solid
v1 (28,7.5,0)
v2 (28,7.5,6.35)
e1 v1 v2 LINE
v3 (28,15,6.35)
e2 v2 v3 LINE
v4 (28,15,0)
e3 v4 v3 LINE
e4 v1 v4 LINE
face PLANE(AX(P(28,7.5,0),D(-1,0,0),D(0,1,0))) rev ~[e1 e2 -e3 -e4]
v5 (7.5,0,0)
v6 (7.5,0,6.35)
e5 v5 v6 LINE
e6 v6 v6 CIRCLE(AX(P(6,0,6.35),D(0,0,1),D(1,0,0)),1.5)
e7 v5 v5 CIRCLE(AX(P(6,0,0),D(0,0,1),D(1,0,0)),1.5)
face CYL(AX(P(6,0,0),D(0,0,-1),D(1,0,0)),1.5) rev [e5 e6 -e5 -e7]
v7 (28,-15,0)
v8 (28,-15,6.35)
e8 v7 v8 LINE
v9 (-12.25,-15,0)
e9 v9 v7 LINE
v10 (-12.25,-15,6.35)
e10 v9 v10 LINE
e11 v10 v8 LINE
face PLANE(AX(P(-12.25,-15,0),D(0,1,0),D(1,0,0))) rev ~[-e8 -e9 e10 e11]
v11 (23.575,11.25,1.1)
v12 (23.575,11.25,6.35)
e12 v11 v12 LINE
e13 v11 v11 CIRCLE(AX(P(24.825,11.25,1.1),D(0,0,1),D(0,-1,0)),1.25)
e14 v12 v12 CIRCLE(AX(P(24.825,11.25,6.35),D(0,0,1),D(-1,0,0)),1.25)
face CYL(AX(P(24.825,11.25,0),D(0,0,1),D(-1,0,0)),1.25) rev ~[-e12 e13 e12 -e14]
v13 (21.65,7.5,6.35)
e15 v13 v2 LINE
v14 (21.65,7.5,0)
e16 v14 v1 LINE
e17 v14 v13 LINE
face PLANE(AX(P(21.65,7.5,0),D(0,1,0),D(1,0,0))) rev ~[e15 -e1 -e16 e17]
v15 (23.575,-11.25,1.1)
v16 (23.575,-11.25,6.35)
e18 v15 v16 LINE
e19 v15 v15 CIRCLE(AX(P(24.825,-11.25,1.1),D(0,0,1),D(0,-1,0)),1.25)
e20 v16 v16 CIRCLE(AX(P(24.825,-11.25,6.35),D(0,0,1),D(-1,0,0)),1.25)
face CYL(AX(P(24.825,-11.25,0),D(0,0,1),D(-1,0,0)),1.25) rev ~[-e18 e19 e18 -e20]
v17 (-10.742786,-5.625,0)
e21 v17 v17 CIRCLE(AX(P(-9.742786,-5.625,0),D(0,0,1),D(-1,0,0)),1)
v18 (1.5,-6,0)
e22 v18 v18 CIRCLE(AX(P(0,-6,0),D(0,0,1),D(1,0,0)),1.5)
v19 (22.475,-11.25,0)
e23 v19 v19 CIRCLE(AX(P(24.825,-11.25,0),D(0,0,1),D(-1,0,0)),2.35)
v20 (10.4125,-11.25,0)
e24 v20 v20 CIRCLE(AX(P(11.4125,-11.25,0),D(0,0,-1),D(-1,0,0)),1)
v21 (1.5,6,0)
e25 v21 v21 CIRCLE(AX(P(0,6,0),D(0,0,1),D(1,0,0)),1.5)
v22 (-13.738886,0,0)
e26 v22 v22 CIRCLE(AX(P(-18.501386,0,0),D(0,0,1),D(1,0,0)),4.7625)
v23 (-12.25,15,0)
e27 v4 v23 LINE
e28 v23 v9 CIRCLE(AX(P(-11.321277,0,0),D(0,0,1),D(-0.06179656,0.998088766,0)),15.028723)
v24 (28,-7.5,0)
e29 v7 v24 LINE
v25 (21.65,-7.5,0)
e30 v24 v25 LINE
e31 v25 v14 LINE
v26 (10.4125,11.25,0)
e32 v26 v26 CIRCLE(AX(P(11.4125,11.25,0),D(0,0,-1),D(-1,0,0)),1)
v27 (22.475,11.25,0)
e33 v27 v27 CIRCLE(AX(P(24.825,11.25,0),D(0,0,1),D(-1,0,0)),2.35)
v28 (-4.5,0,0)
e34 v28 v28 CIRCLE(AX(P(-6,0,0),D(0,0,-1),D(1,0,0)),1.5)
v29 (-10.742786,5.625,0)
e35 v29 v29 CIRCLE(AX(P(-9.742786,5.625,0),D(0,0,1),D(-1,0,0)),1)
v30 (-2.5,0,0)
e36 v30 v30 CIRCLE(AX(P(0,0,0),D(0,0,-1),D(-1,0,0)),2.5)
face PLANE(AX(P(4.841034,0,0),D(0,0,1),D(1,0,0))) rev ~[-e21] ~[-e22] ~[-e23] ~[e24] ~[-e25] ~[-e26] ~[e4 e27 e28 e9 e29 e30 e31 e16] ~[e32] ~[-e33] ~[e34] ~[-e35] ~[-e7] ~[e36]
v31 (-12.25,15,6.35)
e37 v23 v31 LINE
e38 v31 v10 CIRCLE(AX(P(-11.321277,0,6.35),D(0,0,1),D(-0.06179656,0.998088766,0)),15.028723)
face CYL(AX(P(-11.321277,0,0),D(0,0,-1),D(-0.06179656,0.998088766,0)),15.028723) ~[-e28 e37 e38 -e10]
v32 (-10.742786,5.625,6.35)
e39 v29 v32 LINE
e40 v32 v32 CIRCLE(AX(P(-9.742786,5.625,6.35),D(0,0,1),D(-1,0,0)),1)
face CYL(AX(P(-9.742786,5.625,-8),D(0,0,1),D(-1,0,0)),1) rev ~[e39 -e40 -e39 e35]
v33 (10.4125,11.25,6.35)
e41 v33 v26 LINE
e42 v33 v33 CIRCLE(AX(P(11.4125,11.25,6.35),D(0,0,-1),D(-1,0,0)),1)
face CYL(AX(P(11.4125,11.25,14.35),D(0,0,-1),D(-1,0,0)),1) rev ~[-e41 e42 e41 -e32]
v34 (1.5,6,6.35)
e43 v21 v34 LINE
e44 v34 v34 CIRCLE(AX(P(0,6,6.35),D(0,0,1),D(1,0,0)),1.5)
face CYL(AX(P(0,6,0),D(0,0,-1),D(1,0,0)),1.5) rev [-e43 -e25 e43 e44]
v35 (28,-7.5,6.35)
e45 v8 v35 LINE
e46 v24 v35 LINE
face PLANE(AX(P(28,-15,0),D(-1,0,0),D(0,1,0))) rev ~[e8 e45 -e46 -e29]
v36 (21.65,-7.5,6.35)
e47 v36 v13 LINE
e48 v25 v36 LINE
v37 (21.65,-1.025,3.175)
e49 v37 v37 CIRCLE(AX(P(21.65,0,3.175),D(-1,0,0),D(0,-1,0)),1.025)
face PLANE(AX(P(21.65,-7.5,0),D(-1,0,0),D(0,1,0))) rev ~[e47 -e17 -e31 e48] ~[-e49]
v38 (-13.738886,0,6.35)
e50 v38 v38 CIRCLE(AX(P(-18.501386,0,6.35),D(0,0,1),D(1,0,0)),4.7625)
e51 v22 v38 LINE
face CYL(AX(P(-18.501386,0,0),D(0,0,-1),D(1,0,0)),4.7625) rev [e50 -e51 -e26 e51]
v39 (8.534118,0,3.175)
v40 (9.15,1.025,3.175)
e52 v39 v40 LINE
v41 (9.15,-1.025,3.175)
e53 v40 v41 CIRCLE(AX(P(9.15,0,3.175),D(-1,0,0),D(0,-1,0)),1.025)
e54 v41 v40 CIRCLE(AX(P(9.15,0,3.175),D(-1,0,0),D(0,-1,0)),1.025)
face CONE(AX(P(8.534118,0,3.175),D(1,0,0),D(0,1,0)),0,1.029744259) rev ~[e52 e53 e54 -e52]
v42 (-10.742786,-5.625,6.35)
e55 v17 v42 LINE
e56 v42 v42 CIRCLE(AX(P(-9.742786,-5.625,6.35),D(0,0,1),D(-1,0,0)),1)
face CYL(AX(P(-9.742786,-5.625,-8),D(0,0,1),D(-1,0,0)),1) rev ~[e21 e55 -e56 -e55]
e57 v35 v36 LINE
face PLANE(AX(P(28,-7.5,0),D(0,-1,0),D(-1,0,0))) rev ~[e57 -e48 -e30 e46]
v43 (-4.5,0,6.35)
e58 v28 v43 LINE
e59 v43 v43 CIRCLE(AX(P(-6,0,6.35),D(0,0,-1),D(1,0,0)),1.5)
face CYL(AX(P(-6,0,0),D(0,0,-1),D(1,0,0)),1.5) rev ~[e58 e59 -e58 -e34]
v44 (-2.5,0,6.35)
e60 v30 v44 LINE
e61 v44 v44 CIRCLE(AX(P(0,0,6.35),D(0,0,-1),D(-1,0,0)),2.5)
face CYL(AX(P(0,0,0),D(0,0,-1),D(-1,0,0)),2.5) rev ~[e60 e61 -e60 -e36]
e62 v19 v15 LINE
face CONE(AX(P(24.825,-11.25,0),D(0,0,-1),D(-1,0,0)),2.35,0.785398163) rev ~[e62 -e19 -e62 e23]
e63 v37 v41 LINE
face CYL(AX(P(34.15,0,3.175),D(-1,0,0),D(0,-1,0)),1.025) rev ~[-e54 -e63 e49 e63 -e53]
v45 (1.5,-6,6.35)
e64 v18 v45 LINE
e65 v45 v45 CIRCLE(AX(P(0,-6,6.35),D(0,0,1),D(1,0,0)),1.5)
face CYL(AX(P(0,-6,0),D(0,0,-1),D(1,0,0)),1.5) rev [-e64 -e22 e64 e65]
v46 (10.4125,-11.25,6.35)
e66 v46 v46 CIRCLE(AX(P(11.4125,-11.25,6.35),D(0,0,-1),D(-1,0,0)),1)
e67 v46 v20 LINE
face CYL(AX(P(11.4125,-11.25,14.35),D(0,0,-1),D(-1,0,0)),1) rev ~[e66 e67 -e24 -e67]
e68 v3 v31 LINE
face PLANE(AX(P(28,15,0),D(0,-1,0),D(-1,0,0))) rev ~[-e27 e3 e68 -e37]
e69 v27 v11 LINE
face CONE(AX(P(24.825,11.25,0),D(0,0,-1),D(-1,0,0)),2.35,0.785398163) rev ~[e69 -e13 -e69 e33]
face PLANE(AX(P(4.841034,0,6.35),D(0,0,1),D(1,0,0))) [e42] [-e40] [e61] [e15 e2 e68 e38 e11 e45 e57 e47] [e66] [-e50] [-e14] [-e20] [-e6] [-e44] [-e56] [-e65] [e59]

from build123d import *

# Parameters (mm, degrees)
F0_R           = 1.5
F0_R_2         = 4.7625
F1_DEPTH       = 6.35
F2_D           = 2.5
F2_CSINK_D     = 4.7
F2_CSINK_ANGLE = 90
F4_D           = 2.05
F4_DEPTH       = 12.5
F4_TIP         = 0.6158821345
F5_D           = 2
F5_DEPTH       = 8
F5_TIP         = 0.600860619
F7_D           = 2
F7_DEPTH       = 8
F7_TIP         = 0.600860619


# Not quite as in the source:
# - a length typed as a fraction of an inch, garbled in the dataset ("3 / 203.2 mm" for 3/8 in), is restored


with BuildPart() as f1:
    # F0 (on Top) → F1 (new body)
    with BuildSketch(Plane.XY):
        with BuildLine():
            Line((28, 15), (-12.25, 15))
            ThreePointArc((-12.25, 15), (-26.35, 0), (-12.25, -15))
            Line((-12.25, -15), (28, -15))
            Line((28, -15), (28, -7.5))
            Line((28, -7.5), (21.65, -7.5))
            Line((21.65, -7.5), (21.65, 7.5))
            Line((21.65, 7.5), (28, 7.5))
            Line((28, 7.5), (28, 15))
        make_face()
        with Locations((0, -6)):
            Circle(F0_R, mode=Mode.SUBTRACT)
        with Locations((-18.5013860464, 0)):
            Circle(F0_R_2, mode=Mode.SUBTRACT)
        with BuildLine():
            ThreePointArc((-7.5, 0), (-6, 1.5), (-4.5, 0))
            ThreePointArc((-4.5, 0), (-6, -1.5), (-7.5, 0))
        make_face(mode=Mode.SUBTRACT)
        with BuildLine():
            ThreePointArc((2.5, 0), (0, -2.5), (-2.5, 0))
            ThreePointArc((-2.5, 0), (0, 2.5), (2.5, 0))
        make_face(mode=Mode.SUBTRACT)
        with Locations((0, 6)):
            Circle(F0_R, mode=Mode.SUBTRACT)
        with Locations((6, 0)):
            Circle(F0_R, mode=Mode.SUBTRACT)
    extrude(amount=F1_DEPTH)

    # F2 (through all)
    with Locations(Plane(origin=(0, 0, 0), x_dir=(1, 0, 0), z_dir=(0, 0, -1))):
        with Locations((24.825, -11.25), (24.825, 11.25)):
            CounterSinkHole(F2_D / 2, F2_CSINK_D / 2, counter_sink_angle=F2_CSINK_ANGLE)

    # F4
    with Locations(Plane.YZ.offset(21.65)):
        with Locations((0, 3.175)):
            Hole(F4_D / 2, depth=F4_DEPTH)
            with Locations((0, 0, -(F4_DEPTH + F4_TIP / 2))):  # 118° drill point
                Cone(0, F4_D / 2, F4_TIP, mode=Mode.SUBTRACT)

    # F5
    with Locations(Plane(origin=(0, 0, 0), x_dir=(1, 0, 0), z_dir=(0, 0, -1))):
        with Locations((-9.7427857926, 5.625), (-9.7427857926, -5.625)):
            Hole(F5_D / 2, depth=F5_DEPTH)
            with Locations((0, 0, -(F5_DEPTH + F5_TIP / 2))):  # 118° drill point
                Cone(0, F5_D / 2, F5_TIP, mode=Mode.SUBTRACT)

    # F7
    with Locations(Plane.XY.offset(6.35)):
        with Locations((11.4125, -11.25), (11.4125, 11.25)):
            Hole(F7_D / 2, depth=F7_DEPTH)
            with Locations((0, 0, -(F7_DEPTH + F7_TIP / 2))):  # 118° drill point
                Cone(0, F7_D / 2, F7_TIP, mode=Mode.SUBTRACT)


solid = f1.part
